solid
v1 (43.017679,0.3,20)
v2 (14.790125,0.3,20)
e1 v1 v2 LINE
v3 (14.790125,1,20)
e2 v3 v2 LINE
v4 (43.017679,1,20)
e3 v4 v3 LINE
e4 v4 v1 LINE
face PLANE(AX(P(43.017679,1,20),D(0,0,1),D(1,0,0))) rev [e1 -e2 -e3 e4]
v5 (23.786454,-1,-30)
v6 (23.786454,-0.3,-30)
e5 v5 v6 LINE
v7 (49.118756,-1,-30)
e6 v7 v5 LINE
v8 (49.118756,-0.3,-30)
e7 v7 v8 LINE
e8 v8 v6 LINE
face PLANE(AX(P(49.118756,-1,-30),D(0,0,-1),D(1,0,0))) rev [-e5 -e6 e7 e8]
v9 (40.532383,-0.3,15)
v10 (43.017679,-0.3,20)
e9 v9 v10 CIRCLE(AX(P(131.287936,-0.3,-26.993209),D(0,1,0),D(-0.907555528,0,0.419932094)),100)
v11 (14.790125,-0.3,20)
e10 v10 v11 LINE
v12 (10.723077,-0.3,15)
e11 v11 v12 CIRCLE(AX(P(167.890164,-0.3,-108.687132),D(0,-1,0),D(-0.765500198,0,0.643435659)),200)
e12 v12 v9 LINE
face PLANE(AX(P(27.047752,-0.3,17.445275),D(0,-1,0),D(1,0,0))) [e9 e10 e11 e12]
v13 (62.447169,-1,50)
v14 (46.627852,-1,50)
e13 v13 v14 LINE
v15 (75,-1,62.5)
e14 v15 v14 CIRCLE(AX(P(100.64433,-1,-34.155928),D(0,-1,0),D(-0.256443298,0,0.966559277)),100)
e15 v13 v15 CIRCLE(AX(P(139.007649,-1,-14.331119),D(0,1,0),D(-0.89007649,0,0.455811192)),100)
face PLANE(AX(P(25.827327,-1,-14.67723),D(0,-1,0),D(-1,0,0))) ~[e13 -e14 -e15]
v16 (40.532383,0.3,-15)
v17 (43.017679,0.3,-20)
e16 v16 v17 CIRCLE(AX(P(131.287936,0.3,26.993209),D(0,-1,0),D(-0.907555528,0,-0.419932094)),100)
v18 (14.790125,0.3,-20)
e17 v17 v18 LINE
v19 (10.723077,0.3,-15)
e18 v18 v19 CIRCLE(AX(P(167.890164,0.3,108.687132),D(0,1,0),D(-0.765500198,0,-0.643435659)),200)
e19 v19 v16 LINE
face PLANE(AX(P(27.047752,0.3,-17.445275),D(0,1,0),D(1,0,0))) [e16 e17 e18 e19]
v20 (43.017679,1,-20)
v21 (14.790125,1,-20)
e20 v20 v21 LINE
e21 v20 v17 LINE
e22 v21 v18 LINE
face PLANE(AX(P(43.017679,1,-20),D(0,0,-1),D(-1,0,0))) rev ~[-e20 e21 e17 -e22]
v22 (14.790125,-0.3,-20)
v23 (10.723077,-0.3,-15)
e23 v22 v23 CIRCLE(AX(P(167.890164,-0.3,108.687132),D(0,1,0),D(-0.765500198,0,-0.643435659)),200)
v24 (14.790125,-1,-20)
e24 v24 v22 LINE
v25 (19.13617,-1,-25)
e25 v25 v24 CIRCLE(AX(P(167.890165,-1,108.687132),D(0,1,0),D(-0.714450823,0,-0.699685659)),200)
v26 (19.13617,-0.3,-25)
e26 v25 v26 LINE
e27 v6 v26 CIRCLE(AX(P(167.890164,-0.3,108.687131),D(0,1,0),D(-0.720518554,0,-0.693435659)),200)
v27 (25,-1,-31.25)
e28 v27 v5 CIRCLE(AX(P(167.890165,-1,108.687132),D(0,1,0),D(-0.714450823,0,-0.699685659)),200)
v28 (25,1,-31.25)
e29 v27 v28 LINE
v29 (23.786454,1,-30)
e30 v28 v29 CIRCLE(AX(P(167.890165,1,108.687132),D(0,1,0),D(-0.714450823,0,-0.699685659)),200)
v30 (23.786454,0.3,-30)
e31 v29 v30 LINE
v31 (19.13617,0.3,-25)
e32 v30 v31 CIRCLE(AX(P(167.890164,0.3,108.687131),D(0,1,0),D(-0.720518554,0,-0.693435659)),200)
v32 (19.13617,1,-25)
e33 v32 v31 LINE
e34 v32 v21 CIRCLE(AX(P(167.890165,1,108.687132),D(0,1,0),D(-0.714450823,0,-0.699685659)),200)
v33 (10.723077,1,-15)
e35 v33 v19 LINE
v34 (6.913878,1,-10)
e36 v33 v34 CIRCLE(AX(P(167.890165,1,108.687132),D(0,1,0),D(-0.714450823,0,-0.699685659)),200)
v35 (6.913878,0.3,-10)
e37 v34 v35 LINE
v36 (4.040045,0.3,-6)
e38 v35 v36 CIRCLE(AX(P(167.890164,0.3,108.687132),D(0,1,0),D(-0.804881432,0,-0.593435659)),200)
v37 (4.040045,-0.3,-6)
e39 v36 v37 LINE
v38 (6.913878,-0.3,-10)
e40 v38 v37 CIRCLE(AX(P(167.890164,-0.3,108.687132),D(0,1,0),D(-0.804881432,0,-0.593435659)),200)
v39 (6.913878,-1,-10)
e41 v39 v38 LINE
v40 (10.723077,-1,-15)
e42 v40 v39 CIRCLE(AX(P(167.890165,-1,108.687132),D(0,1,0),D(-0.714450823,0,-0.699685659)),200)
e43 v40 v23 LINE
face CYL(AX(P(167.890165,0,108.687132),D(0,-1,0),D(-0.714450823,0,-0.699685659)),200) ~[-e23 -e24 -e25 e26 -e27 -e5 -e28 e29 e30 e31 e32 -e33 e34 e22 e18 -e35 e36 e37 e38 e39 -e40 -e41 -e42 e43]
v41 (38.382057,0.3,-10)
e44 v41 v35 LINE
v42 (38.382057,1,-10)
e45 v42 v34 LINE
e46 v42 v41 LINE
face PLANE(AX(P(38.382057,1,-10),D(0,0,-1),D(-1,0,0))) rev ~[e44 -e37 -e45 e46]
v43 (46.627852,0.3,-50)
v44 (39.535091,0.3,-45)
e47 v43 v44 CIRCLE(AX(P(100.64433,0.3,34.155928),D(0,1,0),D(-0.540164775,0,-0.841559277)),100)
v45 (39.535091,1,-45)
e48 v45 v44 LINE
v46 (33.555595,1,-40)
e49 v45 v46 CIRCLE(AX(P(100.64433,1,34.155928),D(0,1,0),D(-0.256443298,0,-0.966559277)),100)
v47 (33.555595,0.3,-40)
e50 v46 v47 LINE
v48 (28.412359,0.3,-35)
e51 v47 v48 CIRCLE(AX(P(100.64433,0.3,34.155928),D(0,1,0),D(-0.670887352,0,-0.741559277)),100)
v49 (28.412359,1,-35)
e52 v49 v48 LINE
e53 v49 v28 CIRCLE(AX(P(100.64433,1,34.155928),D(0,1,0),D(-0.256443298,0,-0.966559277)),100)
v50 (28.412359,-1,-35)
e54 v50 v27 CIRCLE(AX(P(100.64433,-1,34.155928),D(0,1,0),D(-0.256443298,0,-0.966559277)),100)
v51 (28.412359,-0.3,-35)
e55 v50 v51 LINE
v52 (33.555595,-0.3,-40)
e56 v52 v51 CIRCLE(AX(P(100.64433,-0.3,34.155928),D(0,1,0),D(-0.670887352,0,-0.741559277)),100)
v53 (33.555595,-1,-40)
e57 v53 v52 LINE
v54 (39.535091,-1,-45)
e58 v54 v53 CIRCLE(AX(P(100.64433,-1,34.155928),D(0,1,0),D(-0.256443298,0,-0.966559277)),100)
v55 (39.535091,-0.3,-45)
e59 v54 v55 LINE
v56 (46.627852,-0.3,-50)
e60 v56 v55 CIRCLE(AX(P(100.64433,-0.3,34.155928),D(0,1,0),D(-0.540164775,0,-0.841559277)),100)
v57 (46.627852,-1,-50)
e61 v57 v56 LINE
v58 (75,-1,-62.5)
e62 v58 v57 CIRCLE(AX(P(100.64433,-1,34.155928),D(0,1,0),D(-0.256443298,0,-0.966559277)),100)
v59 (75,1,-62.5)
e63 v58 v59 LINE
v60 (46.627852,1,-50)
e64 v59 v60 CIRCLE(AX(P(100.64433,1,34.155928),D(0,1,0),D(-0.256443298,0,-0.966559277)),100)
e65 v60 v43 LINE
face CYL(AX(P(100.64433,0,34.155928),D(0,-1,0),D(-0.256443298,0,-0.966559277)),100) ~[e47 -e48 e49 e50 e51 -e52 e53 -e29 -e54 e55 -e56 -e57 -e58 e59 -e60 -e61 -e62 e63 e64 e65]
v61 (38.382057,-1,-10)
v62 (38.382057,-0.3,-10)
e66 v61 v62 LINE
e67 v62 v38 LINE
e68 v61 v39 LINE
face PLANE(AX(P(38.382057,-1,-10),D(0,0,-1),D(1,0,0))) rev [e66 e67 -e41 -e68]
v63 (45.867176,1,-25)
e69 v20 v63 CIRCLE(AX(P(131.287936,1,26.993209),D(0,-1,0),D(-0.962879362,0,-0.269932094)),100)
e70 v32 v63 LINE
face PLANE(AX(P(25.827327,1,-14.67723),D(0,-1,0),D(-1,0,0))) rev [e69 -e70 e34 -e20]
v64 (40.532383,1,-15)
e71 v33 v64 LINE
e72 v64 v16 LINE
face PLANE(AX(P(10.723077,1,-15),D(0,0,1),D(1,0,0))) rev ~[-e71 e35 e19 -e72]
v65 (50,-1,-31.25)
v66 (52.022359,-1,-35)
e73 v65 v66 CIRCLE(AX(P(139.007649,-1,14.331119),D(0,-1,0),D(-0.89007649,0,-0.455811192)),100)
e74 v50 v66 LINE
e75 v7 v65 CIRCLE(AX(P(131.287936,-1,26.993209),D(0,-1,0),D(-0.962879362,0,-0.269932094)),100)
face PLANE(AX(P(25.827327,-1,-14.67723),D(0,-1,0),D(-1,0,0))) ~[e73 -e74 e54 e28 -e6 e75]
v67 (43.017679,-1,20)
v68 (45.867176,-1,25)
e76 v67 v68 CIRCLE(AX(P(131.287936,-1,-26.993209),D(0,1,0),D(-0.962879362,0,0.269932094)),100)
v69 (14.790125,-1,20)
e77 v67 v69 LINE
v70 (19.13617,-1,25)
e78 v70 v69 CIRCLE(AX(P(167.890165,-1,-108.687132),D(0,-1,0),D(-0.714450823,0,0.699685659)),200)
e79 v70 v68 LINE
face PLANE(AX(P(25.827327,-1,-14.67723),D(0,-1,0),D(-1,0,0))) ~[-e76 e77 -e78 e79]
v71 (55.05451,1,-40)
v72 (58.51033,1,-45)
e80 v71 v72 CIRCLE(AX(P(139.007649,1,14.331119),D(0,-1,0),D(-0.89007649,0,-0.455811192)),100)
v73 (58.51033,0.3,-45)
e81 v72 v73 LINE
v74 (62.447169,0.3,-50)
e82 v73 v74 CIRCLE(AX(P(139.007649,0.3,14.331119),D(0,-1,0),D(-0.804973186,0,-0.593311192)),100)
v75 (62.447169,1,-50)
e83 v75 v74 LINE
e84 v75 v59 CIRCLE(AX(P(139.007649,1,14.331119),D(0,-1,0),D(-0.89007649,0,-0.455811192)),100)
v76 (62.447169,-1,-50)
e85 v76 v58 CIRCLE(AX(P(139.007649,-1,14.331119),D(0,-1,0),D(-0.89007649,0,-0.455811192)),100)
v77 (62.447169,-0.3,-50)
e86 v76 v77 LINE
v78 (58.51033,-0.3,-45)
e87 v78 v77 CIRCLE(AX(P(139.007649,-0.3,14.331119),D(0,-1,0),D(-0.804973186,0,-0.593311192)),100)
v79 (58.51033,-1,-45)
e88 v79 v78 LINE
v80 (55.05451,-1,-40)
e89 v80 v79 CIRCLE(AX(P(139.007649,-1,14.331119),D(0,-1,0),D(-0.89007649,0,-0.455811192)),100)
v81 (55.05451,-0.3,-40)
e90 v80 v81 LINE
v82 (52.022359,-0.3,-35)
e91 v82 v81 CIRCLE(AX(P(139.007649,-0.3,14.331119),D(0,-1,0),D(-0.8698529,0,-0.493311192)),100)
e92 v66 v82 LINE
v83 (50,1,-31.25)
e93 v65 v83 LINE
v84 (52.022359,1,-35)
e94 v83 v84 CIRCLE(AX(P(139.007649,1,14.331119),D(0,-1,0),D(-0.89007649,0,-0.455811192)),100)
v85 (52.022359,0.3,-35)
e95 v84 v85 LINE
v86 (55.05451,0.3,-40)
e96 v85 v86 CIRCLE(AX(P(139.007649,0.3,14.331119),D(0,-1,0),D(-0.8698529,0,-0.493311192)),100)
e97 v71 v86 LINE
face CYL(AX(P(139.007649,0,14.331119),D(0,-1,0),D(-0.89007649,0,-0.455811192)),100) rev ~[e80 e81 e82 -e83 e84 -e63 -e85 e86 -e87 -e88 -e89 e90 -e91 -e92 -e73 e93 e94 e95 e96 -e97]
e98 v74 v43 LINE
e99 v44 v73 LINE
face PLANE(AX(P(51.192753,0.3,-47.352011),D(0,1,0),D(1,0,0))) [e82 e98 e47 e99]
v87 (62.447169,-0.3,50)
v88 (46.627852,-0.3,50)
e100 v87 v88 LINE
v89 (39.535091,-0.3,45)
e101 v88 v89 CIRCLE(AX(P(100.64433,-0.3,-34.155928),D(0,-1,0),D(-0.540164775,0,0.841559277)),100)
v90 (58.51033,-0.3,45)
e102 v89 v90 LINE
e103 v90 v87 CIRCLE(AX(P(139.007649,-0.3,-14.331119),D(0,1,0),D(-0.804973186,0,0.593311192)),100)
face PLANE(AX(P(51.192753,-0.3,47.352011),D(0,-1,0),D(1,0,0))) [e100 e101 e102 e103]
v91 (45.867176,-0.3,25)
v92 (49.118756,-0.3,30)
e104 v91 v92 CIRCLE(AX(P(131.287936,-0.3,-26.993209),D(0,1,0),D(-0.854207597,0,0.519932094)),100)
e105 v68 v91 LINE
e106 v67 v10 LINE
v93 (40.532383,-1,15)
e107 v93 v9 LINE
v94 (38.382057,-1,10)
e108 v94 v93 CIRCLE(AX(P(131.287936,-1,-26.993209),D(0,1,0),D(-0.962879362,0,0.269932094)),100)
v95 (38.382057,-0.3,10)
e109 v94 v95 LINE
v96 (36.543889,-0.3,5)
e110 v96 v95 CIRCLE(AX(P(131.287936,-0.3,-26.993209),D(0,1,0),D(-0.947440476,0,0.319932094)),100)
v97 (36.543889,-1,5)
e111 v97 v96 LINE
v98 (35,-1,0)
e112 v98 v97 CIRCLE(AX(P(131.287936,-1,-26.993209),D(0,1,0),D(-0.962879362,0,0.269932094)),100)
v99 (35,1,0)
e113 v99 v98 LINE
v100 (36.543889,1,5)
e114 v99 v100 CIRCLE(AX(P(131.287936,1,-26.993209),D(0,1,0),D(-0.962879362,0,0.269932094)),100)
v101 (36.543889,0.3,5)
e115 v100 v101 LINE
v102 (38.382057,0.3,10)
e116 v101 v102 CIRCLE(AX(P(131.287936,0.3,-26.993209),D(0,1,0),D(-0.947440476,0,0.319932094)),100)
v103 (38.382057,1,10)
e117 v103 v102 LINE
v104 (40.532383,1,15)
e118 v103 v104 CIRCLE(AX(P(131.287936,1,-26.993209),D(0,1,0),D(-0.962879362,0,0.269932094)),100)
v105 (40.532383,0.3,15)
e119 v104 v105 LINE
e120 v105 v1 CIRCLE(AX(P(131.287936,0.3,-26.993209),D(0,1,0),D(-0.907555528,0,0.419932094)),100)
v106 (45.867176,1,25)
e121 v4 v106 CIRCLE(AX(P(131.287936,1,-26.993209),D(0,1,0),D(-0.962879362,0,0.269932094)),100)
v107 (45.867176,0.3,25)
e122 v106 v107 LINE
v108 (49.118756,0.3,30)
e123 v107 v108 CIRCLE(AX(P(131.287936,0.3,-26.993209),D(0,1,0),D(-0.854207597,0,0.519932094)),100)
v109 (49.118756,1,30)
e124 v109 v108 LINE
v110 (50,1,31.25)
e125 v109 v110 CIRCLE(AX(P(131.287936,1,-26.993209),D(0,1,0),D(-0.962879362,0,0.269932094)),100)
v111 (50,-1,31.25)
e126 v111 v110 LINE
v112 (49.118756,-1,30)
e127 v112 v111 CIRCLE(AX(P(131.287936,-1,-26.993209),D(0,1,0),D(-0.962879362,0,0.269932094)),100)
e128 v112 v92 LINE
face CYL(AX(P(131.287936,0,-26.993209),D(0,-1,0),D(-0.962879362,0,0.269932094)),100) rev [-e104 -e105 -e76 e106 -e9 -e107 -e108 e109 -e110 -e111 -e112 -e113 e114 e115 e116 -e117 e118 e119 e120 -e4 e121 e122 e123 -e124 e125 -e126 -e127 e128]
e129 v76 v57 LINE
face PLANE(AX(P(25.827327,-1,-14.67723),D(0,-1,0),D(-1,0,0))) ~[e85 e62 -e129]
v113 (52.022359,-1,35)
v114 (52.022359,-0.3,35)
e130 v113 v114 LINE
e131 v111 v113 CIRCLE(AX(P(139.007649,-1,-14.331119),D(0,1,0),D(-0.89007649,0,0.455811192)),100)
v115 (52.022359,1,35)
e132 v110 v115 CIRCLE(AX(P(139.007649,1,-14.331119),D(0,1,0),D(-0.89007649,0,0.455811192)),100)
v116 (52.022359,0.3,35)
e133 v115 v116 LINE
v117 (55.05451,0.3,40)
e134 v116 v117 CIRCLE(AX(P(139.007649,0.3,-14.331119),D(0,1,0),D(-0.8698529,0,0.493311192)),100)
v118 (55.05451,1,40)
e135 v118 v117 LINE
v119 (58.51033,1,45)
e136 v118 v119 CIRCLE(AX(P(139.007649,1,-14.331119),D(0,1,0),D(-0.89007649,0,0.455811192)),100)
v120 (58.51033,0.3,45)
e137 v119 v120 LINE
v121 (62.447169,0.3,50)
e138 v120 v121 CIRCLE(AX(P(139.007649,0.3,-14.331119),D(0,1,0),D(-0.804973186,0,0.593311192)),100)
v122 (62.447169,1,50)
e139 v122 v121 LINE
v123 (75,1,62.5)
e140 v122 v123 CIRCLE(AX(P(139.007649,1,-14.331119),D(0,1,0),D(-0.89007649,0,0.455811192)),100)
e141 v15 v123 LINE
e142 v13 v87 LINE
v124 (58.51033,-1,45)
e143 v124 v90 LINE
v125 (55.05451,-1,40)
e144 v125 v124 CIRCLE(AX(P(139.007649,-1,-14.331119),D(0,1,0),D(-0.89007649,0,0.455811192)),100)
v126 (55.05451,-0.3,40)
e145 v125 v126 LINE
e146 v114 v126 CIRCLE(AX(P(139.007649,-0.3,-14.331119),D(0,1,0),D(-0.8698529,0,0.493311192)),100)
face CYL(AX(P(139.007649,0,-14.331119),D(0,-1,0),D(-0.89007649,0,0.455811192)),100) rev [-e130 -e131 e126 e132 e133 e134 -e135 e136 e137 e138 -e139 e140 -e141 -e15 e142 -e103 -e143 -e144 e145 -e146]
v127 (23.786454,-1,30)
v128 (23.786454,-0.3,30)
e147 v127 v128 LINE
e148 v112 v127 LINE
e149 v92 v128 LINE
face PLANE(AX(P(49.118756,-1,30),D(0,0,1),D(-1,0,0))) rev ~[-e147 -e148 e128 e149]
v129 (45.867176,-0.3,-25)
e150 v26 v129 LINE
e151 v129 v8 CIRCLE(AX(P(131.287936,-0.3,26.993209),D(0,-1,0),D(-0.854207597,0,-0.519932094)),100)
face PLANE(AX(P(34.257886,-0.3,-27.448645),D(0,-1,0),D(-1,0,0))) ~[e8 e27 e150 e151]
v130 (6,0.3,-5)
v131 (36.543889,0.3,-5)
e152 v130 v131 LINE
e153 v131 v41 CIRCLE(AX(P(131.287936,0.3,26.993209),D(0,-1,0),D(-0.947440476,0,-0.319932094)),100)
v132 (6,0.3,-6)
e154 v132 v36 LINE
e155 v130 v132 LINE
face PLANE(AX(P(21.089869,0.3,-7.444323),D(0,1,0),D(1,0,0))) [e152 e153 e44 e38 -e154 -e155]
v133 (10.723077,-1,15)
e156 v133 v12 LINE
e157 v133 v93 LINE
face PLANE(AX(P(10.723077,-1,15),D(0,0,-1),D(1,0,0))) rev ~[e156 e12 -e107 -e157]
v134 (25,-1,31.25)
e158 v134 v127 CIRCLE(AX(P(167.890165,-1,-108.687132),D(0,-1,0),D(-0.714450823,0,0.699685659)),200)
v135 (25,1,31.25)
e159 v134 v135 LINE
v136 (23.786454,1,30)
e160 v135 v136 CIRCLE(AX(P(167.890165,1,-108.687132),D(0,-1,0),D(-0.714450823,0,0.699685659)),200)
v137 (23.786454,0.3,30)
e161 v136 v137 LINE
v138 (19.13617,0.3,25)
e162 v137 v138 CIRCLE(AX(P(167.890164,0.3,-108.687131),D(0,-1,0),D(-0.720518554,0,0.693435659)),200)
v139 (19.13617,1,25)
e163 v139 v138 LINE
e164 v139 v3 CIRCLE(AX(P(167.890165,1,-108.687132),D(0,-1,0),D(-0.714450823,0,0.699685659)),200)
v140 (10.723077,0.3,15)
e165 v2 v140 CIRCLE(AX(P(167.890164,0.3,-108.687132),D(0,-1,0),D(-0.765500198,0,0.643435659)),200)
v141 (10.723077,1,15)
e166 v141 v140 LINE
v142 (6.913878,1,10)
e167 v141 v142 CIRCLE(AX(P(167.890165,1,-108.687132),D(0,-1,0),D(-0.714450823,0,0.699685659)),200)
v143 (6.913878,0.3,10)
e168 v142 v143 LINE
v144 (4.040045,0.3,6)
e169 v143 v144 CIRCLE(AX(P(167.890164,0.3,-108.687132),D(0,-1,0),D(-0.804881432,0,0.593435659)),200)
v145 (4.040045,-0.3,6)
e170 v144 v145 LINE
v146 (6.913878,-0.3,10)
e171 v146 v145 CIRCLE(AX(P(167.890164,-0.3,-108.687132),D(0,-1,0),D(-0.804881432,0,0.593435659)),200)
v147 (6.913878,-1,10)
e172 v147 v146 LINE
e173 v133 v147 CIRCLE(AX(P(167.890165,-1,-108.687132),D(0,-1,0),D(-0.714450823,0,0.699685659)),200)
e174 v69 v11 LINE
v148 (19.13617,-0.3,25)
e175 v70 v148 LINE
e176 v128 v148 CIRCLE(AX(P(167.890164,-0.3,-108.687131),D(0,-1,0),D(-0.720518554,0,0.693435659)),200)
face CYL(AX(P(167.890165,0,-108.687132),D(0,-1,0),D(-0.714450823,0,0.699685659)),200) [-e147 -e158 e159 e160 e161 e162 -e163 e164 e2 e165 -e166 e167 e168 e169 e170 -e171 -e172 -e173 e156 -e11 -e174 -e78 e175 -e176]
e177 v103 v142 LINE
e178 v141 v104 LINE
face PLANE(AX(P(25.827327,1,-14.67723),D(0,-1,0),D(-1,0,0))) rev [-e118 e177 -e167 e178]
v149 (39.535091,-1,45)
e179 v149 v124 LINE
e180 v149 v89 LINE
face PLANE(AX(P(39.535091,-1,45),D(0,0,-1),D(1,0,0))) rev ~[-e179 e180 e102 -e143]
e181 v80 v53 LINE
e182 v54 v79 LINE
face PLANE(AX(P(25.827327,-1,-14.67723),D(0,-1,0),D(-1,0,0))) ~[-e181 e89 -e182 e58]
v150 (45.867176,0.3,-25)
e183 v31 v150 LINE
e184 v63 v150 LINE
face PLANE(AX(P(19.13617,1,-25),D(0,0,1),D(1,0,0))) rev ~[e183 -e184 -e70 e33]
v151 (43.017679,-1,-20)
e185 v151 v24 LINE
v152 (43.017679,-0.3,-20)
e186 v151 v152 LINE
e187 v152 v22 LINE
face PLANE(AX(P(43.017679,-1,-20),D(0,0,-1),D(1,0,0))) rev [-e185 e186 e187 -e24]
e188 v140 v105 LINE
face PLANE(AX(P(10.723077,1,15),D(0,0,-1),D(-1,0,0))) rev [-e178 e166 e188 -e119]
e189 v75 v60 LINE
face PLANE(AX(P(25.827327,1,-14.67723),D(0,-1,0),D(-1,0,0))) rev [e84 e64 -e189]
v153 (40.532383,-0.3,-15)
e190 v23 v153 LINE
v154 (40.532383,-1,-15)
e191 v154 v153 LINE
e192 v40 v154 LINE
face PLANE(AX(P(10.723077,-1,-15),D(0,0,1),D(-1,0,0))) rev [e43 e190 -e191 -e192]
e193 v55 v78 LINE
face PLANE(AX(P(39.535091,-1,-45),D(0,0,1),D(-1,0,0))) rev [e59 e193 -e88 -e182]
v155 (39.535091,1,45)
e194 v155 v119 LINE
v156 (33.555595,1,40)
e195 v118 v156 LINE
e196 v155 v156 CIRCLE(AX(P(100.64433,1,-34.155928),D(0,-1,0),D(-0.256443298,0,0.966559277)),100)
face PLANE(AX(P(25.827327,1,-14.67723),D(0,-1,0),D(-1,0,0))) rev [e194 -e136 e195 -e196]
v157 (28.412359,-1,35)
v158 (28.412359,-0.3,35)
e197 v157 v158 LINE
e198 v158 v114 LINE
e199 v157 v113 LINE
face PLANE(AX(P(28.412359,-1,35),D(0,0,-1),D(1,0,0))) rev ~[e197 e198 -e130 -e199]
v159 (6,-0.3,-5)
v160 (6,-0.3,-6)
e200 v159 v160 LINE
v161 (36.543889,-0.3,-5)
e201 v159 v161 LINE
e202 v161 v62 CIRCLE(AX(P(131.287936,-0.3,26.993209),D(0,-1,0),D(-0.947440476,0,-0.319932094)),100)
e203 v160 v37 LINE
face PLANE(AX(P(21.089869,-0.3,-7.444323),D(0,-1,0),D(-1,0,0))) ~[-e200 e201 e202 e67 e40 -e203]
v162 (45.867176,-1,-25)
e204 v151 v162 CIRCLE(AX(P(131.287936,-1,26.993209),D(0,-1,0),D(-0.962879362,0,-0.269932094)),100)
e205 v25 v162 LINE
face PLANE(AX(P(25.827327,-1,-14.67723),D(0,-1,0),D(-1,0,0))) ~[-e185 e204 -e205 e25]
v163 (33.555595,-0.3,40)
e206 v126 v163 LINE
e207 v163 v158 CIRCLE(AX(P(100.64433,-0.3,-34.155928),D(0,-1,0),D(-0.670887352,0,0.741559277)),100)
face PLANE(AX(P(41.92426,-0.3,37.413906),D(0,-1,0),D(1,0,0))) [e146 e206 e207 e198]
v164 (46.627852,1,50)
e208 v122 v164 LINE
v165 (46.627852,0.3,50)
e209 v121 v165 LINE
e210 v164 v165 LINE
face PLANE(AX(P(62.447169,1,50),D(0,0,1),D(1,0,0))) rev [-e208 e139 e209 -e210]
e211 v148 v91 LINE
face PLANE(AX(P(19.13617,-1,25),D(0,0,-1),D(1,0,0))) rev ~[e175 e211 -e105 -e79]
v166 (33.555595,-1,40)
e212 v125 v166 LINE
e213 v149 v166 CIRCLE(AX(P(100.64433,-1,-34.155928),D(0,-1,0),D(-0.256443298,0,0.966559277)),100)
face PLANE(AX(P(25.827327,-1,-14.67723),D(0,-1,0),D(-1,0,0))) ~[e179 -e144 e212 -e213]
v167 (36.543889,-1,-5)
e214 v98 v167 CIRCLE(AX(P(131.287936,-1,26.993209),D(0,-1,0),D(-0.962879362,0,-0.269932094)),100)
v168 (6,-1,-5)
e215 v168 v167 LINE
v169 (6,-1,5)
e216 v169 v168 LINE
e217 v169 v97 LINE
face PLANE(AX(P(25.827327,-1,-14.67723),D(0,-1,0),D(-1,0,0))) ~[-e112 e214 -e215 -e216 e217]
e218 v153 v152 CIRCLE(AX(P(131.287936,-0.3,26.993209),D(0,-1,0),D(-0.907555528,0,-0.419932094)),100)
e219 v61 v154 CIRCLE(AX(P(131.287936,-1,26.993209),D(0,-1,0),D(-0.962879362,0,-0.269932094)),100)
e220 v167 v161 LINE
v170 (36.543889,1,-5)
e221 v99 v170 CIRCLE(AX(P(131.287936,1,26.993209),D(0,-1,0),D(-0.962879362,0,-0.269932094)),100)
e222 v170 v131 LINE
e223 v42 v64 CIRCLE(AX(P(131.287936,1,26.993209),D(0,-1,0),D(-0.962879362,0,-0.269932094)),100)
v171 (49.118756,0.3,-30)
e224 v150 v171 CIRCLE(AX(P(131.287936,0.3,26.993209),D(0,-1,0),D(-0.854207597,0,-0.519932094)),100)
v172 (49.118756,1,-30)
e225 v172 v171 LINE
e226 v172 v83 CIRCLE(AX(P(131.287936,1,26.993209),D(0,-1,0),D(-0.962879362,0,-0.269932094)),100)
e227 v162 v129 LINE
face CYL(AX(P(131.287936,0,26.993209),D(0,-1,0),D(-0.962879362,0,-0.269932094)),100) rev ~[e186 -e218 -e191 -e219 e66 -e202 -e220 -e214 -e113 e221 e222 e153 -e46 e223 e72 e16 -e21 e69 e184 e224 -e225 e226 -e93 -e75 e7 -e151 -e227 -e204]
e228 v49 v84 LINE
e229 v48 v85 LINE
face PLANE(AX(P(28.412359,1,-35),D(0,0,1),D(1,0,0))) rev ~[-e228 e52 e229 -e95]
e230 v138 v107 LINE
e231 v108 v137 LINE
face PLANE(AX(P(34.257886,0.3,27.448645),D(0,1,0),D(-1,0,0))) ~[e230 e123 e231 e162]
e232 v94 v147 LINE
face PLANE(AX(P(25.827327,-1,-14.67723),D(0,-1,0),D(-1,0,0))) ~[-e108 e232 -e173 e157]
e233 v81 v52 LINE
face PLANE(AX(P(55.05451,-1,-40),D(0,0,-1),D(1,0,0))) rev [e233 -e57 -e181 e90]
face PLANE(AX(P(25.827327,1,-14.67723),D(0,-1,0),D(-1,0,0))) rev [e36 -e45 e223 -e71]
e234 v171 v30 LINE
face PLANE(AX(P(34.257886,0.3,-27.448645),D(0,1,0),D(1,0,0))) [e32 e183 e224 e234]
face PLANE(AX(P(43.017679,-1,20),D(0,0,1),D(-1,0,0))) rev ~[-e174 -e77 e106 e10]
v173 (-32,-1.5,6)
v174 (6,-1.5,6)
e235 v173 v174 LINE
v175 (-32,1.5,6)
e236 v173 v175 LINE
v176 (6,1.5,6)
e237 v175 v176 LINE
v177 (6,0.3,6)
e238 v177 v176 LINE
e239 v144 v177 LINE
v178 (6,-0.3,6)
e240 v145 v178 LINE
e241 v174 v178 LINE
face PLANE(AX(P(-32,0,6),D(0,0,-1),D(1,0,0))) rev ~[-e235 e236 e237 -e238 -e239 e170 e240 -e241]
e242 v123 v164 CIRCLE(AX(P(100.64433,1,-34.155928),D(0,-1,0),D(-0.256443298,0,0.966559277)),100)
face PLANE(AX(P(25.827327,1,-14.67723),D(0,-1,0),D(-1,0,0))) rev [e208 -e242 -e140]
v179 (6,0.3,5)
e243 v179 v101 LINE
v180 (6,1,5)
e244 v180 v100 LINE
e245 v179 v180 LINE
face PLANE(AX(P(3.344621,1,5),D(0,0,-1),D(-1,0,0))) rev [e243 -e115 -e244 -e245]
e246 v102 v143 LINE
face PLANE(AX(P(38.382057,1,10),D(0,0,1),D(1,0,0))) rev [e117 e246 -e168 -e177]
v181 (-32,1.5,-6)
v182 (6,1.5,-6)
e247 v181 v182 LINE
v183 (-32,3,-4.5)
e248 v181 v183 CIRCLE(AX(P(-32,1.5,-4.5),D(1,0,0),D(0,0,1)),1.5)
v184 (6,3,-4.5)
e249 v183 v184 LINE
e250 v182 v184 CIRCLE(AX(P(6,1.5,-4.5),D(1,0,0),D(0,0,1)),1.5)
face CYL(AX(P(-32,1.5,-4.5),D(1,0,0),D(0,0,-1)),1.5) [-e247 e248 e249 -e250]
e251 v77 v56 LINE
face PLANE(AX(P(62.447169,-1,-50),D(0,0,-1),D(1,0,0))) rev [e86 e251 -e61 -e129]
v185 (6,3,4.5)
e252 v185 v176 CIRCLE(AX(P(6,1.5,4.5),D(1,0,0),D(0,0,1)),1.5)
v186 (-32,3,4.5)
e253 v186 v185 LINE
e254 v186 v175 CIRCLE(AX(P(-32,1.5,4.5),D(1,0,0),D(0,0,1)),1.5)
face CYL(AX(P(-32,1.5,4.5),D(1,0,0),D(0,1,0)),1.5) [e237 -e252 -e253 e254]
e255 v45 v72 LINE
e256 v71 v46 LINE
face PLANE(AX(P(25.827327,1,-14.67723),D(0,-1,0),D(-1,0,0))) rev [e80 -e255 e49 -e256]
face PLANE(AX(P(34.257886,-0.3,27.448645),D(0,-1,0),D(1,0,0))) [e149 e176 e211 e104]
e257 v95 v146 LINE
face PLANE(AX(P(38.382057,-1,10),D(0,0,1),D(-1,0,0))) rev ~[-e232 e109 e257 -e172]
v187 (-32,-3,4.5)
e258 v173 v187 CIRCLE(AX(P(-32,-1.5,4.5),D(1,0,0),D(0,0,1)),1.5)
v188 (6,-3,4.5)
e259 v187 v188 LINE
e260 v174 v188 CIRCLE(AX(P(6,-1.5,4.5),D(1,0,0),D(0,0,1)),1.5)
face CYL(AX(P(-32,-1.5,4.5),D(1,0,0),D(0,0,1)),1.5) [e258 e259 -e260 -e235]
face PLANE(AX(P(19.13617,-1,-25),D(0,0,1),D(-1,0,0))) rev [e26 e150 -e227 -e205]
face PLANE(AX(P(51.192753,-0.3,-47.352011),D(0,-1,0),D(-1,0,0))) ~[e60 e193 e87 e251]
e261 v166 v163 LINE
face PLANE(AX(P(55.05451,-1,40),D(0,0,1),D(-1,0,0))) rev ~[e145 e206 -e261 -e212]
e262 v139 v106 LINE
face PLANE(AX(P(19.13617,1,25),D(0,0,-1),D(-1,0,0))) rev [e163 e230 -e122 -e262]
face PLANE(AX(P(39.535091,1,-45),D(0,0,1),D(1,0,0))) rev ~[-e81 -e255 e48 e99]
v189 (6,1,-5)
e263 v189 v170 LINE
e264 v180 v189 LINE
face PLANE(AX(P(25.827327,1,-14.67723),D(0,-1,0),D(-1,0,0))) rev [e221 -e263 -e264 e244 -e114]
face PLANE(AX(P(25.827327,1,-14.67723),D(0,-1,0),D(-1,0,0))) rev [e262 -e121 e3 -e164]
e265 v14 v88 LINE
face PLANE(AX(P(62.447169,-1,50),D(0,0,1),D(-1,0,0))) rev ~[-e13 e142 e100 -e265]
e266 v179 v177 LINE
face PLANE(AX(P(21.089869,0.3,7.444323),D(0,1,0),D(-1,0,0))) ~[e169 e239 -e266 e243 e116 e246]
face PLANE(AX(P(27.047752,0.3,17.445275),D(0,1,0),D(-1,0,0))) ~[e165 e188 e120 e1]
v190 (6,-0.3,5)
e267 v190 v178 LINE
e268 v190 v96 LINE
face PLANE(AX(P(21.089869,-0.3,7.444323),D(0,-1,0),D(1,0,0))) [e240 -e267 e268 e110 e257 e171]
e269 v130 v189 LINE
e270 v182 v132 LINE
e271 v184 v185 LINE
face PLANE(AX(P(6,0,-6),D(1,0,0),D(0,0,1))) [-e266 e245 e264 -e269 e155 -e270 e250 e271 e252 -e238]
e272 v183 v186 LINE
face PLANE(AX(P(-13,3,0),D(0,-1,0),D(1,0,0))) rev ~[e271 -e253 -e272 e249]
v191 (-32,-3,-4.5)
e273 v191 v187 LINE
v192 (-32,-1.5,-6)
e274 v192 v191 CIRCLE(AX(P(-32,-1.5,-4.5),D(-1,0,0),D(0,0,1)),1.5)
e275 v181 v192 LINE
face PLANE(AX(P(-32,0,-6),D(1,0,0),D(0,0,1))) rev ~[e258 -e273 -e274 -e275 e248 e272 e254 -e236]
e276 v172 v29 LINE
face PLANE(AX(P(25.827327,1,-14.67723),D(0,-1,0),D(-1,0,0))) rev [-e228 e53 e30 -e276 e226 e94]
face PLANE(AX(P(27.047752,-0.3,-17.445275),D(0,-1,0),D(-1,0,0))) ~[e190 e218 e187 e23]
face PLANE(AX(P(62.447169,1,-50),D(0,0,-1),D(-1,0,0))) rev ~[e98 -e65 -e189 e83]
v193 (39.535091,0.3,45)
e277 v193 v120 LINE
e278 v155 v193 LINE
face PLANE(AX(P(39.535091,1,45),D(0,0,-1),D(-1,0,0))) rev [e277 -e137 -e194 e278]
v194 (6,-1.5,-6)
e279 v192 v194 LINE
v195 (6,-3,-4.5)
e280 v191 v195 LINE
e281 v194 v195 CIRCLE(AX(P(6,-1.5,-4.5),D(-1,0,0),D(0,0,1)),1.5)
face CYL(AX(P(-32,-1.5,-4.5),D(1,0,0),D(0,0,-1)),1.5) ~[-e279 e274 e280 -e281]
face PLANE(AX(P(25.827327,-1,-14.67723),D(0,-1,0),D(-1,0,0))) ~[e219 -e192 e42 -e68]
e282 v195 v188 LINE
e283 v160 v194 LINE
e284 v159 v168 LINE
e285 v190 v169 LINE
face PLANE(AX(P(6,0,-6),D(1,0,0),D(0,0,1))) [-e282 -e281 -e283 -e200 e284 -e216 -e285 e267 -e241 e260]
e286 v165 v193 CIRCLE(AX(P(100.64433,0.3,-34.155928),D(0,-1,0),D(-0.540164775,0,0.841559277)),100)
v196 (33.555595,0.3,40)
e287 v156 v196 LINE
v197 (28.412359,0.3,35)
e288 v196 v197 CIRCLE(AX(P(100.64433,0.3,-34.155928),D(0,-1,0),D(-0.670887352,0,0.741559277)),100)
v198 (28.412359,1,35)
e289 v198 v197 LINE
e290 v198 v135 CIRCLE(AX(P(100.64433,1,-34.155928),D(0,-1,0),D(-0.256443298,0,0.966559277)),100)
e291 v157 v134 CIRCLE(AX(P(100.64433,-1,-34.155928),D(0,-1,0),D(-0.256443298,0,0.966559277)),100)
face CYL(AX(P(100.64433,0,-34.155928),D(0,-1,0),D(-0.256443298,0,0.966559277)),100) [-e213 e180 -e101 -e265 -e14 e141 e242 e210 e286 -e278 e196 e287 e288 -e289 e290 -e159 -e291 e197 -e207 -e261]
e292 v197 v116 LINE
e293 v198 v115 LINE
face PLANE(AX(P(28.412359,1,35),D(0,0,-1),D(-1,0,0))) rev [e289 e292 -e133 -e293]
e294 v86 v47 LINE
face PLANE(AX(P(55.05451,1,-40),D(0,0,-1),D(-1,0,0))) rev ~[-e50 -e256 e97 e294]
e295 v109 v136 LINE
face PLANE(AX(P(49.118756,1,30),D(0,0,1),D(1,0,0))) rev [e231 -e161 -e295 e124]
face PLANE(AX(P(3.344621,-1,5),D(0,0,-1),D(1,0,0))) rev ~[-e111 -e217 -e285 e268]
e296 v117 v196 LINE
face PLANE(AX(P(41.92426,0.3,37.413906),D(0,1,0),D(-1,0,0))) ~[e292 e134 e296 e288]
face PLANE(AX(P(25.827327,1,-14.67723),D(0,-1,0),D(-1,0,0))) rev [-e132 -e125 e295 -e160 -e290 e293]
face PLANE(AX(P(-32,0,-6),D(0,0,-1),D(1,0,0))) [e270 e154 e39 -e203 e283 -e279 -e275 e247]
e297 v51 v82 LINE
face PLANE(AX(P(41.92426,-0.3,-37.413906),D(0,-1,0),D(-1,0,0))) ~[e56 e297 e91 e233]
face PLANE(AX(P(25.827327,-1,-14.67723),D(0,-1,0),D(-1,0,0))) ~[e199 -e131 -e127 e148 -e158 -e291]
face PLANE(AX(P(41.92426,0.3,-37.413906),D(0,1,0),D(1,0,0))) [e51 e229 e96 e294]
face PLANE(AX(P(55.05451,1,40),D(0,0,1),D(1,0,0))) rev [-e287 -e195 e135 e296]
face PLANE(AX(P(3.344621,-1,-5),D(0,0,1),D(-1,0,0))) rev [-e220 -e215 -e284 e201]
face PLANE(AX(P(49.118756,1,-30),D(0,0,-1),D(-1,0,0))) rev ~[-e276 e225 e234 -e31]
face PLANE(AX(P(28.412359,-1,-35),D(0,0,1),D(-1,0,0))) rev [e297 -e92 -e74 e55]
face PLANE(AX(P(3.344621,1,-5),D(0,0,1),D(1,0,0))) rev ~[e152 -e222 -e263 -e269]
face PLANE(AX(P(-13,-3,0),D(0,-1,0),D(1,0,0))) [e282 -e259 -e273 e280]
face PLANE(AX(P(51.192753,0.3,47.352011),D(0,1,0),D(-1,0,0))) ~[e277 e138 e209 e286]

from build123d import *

# Parameters (mm, degrees)
F1_DEPTH         = 1
F4_DEPTH         = 0.7
F4_COPIES2_COUNT = 2
F5_W             = 38
F5_H             = 12
F6_DEPTH         = 3
F7_R             = 1.5


# Not quite as in the source:
# - a pattern or mirror of a feature is missing from the dataset's text; its kind, count and spacing are read off the source's solid


with BuildPart() as f1:
    # F0 (on Front) → F1 (new body, symmetric)
    with BuildSketch(Plane.XZ):
        with BuildLine():
            ThreePointArc((25, 31.25), (11.7164027855, 16.2518777716), (0, 0))
            Line((0, 0), (35, 0))
            ThreePointArc((35, 0), (41.1356304071, 16.2798974046), (50, 31.25))
            Line((50, 31.25), (25, 31.25))
        make_face()
        with BuildLine():
            ThreePointArc((75, 62.5), (47.6444357815, 50.6439027497), (25, 31.25))
            Line((25, 31.25), (50, 31.25))
            ThreePointArc((50, 31.25), (60.9207680237, 48.138385581), (75, 62.5))
        make_face()
    extrude(amount=F1_DEPTH, both=True)

    # F2: F1 across plane


with BuildPart() as f1_1:
    add(f1.part)
    add(f1.part.mirror(Plane.XY))

    # F3 (on face) → F4 (cut)
    with BuildSketch(Plane.XZ.offset(1)):
        with BuildLine():
            Line((38.3820565676, 10), (6.9138783475, 10))
            ThreePointArc((6.9138783475, 10), (5.1100506614, 7.5137050995), (3.3446205931, 5))
            Line((3.3446205931, 5), (36.543888556, 5))
            ThreePointArc((36.543888556, 5), (37.4296717705, 7.5122424899), (38.3820565676, 10))
        make_face()
        with BuildLine():
            ThreePointArc((14.7901250767, 20), (12.736458423, 17.5163842045), (10.7230770186, 15))
            Line((10.7230770186, 15), (40.5323833312, 15))
            ThreePointArc((40.5323833312, 15), (41.7401268698, 17.5173495329), (43.0176791325, 20))
            Line((43.0176791325, 20), (14.7901250767, 20))
        make_face()
        with BuildLine():
            ThreePointArc((23.7864537922, 30), (21.4399722373, 27.5198472862), (19.1361704174, 25))
            Line((19.1361704174, 25), (45.8671764928, 25))
            ThreePointArc((45.8671764928, 25), (47.4556813757, 27.5242471055), (49.1187564845, 30))
            Line((49.1187564845, 30), (23.7864537922, 30))
        make_face()
        with BuildLine():
            ThreePointArc((33.5555945556, 40), (30.9391304542, 37.5461308043), (28.4123585311, 35))
            Line((28.4123585311, 35), (52.0223589414, 35))
            ThreePointArc((52.0223589414, 35), (53.5018795741, 37.5221680923), (55.0545103176, 40))
            Line((55.0545103176, 40), (33.5555945556, 40))
        make_face()
        with BuildLine():
            ThreePointArc((46.6278522844, 50), (43.0272085219, 47.5769747675), (39.5350905643, 45))
            Line((39.5350905643, 45), (58.5103303946, 45))
            ThreePointArc((58.5103303946, 45), (60.4389654659, 47.5313247859), (62.4471689161, 50))
            Line((62.4471689161, 50), (46.6278522844, 50))
        make_face()
    f4 = extrude(amount=-F4_DEPTH, mode=Mode.SUBTRACT)

    # F4_copies: F4 across plane
    add(f4.mirror(Plane.ZX), mode=Mode.SUBTRACT)

    # F4_copies1: F4 across plane
    add(f4.mirror(Plane(origin=(0, 0, 0), x_dir=(-1, 0, 0), z_dir=(0, 0, -1))), mode=Mode.SUBTRACT)

    # F4_copies2: F4 ×2 about axis
    f4_copies2_axis = Axis((0, 0, 0), (1, 0, 0))
    for i in range(1, F4_COPIES2_COUNT):
        add(f4.rotate(f4_copies2_axis, i * 360 / F4_COPIES2_COUNT), mode=Mode.SUBTRACT)

    # F5 (on Front) → F6 (join, symmetric)
    with BuildSketch(Plane.XZ):
        with Locations((-13, 0)):
            Rectangle(F5_W, F5_H)
    extrude(amount=F6_DEPTH, both=True)

    # F7
    f7_edges = [f1_1.edges().sort_by_distance(p)[0] for p in [
        (-13, 3, 6),
        (-13, -3, 6),
        (-13, -3, -6),
        (-13, 3, -6),
    ]]
    fillet(f7_edges, radius=F7_R)


solid = f1_1.part
